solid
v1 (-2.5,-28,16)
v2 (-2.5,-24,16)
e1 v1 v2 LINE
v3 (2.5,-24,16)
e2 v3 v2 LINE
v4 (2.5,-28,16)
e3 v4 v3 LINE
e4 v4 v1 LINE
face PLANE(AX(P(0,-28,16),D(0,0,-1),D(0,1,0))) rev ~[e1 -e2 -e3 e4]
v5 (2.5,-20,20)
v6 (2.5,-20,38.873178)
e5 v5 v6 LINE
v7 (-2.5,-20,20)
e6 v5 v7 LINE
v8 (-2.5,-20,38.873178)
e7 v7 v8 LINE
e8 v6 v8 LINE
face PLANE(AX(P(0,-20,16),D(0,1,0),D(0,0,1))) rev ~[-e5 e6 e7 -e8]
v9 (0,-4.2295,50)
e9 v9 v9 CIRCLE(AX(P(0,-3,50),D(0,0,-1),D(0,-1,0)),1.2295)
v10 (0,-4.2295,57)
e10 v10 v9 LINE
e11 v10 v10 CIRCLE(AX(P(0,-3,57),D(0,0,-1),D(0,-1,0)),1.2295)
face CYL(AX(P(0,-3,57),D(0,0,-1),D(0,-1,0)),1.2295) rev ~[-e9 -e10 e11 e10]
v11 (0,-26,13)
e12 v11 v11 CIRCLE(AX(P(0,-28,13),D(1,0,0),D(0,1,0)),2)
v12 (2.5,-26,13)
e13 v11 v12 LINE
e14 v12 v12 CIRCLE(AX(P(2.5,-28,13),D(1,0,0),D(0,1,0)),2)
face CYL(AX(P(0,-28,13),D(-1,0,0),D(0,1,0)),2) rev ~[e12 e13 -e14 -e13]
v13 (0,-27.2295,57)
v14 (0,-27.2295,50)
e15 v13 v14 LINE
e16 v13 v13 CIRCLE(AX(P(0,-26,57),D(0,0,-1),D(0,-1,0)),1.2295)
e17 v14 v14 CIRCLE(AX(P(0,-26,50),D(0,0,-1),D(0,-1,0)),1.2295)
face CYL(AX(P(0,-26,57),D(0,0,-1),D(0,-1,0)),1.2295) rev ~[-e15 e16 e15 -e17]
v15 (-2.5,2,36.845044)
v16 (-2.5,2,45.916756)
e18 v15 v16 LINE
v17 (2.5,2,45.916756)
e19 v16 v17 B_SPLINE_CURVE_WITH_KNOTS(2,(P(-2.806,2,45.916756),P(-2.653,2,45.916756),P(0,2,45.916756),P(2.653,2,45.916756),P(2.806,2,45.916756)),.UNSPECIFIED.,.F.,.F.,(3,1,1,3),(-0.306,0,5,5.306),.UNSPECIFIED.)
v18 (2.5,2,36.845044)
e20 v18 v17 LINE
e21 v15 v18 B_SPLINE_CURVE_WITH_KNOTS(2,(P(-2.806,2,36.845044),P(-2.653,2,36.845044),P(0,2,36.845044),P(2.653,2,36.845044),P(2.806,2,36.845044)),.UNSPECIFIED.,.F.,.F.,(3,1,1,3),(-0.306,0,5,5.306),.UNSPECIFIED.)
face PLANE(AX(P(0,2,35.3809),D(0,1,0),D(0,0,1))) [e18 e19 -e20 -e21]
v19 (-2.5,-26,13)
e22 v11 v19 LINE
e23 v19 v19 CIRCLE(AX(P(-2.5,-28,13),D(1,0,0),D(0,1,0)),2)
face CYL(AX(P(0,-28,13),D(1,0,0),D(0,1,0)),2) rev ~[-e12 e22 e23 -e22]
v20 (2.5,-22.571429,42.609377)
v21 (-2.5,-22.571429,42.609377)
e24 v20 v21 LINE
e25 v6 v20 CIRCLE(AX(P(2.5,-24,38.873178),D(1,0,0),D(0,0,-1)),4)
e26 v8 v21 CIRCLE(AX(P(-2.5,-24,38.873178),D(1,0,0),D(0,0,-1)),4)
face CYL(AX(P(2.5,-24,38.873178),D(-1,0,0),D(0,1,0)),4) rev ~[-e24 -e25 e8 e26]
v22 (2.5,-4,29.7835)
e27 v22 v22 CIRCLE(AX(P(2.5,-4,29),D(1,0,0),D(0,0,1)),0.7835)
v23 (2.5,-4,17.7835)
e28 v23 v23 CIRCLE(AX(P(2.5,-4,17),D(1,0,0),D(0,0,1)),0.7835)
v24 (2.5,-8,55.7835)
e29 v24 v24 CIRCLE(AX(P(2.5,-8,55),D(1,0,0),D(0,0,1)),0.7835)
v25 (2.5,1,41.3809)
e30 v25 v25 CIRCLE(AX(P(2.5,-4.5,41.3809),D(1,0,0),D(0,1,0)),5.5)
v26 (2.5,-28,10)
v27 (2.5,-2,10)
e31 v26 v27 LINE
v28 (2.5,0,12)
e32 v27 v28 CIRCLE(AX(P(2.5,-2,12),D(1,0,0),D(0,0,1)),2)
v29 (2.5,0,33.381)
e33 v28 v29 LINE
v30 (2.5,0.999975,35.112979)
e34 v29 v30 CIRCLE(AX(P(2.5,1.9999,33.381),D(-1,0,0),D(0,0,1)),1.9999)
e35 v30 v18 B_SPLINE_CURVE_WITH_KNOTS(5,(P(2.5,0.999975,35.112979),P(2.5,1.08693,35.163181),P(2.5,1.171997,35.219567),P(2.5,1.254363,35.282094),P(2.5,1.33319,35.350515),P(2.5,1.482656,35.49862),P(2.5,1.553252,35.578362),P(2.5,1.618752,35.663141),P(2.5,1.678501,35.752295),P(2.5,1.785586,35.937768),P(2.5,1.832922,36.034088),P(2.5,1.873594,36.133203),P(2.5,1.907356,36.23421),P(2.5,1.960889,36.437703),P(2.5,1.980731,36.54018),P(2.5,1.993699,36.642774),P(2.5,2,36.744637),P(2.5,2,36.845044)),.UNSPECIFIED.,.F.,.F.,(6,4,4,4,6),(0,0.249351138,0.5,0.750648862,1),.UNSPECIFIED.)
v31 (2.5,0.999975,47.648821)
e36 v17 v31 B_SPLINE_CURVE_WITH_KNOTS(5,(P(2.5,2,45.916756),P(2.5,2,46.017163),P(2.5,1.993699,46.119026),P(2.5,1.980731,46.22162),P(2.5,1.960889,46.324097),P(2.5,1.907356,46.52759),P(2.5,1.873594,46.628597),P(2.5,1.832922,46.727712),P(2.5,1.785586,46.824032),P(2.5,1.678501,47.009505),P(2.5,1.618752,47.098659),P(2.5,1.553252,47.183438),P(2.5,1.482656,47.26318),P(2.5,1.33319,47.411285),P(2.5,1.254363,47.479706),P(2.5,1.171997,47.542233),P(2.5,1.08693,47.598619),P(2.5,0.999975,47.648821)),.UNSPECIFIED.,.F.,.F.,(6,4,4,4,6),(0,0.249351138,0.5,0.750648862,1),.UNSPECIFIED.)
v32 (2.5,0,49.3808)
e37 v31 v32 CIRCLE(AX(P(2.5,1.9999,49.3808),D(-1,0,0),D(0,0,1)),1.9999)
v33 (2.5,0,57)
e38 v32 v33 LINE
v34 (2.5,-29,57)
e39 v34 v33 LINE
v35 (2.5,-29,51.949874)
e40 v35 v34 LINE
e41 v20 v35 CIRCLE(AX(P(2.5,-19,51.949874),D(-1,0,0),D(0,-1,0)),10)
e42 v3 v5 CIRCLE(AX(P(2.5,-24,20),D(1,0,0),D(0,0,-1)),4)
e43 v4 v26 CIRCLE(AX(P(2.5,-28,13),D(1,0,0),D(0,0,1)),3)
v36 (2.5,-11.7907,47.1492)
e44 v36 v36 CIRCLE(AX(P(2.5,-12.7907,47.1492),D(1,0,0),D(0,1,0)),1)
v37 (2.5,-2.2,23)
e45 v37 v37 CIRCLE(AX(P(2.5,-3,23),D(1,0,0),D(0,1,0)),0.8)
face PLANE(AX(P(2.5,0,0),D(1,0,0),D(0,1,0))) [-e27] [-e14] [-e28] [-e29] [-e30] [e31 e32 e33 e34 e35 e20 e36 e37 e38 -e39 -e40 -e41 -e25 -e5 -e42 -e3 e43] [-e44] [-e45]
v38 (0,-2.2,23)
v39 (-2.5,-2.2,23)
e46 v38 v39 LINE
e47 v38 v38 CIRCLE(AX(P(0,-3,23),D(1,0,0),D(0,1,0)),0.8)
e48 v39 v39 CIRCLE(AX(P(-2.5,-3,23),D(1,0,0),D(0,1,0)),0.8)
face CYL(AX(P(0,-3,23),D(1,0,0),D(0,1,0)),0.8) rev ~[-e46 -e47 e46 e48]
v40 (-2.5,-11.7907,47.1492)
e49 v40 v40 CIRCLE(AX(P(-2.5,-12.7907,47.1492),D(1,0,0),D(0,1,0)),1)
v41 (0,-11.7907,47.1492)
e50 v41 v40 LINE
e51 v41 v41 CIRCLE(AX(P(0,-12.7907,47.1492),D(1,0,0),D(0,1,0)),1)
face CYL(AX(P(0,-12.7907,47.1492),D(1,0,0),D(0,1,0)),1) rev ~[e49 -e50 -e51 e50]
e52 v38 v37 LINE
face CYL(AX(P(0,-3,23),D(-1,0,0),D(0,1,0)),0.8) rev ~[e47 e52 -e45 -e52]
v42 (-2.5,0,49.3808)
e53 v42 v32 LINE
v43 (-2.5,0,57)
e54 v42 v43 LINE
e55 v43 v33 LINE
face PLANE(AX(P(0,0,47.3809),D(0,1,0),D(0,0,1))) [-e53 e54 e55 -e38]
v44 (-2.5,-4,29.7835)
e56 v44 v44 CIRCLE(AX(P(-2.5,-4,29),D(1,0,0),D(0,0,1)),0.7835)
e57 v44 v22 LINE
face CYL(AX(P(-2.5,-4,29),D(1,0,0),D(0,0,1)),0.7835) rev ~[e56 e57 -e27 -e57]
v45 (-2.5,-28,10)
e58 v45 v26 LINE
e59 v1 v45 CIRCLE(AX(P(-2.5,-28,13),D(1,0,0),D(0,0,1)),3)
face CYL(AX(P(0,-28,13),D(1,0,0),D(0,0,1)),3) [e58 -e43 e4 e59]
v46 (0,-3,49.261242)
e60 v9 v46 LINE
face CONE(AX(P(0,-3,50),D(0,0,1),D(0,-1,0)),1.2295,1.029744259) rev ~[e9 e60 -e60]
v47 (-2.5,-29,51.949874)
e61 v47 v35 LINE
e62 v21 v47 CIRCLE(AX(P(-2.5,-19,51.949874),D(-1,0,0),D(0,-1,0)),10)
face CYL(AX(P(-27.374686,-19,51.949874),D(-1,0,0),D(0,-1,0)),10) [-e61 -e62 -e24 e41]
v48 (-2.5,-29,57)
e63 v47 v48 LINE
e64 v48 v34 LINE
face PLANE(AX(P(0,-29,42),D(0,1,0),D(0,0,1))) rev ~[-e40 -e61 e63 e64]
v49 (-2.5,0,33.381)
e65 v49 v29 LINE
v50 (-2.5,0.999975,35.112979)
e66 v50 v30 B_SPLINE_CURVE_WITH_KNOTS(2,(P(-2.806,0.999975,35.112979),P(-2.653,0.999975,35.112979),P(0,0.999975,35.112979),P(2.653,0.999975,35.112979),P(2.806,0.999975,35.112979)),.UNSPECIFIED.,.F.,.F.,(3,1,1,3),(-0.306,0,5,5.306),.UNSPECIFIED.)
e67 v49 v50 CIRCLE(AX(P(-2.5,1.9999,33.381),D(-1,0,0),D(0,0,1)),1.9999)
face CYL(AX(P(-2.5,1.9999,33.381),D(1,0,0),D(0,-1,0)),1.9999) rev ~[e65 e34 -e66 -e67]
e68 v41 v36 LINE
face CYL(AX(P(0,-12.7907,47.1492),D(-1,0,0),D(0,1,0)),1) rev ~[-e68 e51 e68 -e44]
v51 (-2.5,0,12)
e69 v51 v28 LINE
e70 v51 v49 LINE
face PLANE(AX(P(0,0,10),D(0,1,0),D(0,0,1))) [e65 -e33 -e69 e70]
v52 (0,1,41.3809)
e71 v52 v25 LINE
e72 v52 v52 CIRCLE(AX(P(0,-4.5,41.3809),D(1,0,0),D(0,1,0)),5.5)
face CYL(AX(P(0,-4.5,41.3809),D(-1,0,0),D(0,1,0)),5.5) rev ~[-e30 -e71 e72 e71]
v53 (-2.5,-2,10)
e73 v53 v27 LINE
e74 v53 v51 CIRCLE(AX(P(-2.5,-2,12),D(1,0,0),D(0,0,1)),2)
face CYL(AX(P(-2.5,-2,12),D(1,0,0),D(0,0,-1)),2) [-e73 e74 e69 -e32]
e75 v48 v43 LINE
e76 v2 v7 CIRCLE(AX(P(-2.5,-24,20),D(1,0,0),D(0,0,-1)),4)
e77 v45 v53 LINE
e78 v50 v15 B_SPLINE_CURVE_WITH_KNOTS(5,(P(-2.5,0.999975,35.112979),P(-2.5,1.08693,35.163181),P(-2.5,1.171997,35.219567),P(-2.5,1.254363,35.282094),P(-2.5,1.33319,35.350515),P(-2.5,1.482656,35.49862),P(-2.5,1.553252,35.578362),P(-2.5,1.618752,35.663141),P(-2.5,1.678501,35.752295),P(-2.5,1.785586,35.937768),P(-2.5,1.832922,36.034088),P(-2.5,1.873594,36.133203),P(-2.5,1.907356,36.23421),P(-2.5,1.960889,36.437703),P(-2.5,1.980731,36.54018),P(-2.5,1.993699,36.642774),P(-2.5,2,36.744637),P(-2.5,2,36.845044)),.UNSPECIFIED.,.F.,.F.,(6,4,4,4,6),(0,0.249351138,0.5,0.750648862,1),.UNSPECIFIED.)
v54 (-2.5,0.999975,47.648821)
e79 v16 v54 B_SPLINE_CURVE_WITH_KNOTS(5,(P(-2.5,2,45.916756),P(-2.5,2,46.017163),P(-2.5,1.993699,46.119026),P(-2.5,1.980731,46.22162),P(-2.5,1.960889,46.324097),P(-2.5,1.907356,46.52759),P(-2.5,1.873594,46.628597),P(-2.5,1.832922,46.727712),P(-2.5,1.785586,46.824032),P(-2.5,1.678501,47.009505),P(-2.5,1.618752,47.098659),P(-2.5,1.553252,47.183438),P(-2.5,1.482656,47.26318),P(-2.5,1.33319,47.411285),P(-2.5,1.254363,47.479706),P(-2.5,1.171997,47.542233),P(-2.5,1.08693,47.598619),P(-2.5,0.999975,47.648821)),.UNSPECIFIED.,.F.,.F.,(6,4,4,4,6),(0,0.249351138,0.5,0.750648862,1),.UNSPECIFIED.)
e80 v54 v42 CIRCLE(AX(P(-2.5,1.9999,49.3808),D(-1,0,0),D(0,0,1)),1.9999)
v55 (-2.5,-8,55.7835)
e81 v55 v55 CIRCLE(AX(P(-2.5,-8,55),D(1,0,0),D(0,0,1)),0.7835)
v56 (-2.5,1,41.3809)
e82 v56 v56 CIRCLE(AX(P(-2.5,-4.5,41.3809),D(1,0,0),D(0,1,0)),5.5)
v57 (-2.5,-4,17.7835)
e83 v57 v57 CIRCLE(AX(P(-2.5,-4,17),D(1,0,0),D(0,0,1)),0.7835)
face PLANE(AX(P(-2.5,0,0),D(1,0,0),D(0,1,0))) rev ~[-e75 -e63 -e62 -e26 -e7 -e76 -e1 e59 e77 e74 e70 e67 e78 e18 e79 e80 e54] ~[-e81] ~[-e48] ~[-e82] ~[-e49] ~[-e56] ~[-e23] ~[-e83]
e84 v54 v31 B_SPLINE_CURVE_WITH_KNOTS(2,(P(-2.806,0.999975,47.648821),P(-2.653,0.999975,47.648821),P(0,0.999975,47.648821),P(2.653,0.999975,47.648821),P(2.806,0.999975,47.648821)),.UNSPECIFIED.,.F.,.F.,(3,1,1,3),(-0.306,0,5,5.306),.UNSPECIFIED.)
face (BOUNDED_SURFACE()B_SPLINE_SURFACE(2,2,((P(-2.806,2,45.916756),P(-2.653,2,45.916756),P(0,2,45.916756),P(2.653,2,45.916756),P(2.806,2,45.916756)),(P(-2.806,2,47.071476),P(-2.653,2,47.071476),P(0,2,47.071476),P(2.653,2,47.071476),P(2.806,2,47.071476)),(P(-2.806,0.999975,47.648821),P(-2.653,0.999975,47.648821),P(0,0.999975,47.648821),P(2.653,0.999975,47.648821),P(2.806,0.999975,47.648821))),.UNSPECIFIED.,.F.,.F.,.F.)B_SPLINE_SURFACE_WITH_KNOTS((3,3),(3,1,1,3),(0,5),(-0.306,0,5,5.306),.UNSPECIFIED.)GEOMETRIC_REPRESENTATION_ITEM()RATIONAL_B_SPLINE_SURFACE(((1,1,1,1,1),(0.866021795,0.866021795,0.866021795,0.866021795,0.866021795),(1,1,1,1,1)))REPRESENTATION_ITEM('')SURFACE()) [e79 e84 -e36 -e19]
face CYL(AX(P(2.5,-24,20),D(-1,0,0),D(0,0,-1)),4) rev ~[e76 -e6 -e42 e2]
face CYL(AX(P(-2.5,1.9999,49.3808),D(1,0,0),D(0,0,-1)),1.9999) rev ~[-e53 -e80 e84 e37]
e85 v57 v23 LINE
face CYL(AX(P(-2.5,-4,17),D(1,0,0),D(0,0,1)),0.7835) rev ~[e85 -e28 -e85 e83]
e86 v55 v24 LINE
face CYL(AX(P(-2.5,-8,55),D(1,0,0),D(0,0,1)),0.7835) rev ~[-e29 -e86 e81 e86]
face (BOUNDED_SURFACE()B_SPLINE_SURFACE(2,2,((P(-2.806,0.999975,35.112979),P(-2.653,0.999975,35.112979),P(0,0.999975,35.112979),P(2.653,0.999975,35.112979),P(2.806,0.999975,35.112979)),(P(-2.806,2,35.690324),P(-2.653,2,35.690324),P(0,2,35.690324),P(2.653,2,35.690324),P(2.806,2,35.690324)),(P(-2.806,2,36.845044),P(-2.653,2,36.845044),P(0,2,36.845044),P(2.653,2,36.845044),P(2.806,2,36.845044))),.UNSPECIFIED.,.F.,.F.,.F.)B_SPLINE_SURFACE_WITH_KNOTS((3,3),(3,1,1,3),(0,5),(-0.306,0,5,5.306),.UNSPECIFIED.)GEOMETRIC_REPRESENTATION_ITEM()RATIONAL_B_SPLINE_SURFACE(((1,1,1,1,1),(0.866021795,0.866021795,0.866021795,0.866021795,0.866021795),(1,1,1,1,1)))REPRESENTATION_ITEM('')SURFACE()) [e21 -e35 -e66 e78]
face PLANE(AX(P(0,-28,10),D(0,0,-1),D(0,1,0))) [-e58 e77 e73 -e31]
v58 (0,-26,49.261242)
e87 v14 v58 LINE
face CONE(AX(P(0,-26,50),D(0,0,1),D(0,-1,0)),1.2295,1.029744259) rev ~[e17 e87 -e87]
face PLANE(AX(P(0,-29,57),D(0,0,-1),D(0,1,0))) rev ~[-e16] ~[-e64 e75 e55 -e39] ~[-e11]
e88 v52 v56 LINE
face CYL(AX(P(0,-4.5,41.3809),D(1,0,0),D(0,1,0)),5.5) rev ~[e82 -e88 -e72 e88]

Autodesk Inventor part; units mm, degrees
ref_plane "YZ Plane" through (0, 0, 0) normal (1, 0, 0) x (0, 1, 0)
ref_plane "XZ Plane" through (0, 0, 0) normal (0, 1, 0) x (-1, 0, 0)
ref_plane "XY Plane" through (0, 0, 0) normal (0, 0, 1) x (1, 0, 0)
sketch "Skizze1" plane through (0, 0, 0) normal (1, 0, 0) x (0, 1, 0)
  circle A0 centre (-22.8, 48.5) radius 11 construction
  circle A1 centre (-4.5, 41.3809) radius 6.5 construction
  line L0 (-97.6965, 0) -> (58.2827, 0) projected
  circle A2 centre (14.5, 21.5) radius 21.5 construction
  line L1 (-28, 10) -> (0, 10)
  line L2 (0, 10) -> (0, 35.3809)
  line L3 (-7, 0) -> (-7, 21.5) construction
  circle A3 centre (-4.5, 41.3809) radius 6 construction
  circle A4 centre (-4.5, 41.3809) radius 5 construction
  line L4 (-56.6136, 29) -> (0, 29) construction
  arc A5 (-28, 16) -> (-28, 10) centre (-28, 13) ccw
  line L5 (-75.4137, 30) -> (0, 30) construction
  line L6 (-28, 16) -> (-20, 16)
  line L7 (-20, 16) -> (-20, 42)
  line L8 (-20, 42) -> (-29, 42)
  line L9 (-29, 42) -> (-29, 57)
  circle A6 centre (-28, 13) radius 2
  circle A7 centre (-4.5, 41.3809) radius 5.5
  circle A8 centre (-22.8, 48.5) radius 0.5
  circle A9 centre (-3, 23) radius 0.8
  line L10 (14.5, 21.5) -> (-7, 21.5) construction
  line L11 (-29, 57) -> (0, 57)
  line L12 (-4.5, 41.3809) -> (-28, 13) construction
  line L13 (14.5, 21.5) -> (14.5, 20.5) construction
  line L14 (14.5, 20.5) -> (-4.5, 41.3809) construction
  circle A10 centre (-22.8, 48.5) radius 5 construction
  circle A11 centre (-12.7907, 47.1492) radius 5.1 construction
  circle A12 centre (-12.7907, 47.1492) radius 5.6 construction
  circle A13 centre (-12.7907, 47.1492) radius 1
  line L15 (0, 35.3809) -> (2, 35.3809)
  line L16 (2, 35.3809) -> (2, 47.3809)
  line L17 (2, 47.3809) -> (0, 47.3809)
  line L18 (0, 47.3809) -> (0, 57)
  line L19 (1, 41.3809) -> (-10, 41.3809) construction
  point P0 (0, 0)
  dimension "d4" = 43
  dimension "d0" = 22
  dimension "d2" = 13
  dimension "d5" = 10
  dimension "d6" = 7
  dimension "d7" = 12
  dimension "d8" = 10
  dimension "d9" = 29
  dimension "d11" = 30
  dimension "d12" = 4
  dimension "d14" = 6
  dimension "d15" = 28
  dimension "d16" = 20
  dimension "d17" = 42
  dimension "d19" = 29
  dimension "d20" = 11
  dimension "d33" = 1
  dimension "d34" = 48.5
  dimension "d36" = 1.6
  dimension "d37" = 3
  dimension "d54" = 57
  dimension "d58" = 1
  dimension "d59" = 81.925
  dimension "d65" = 10
  dimension "d66" = 10.2
  dimension "d67" = 0.5
  dimension "d68" = 2
  dimension "d69" = 2
  dimension "d70" = 6
  dimension "d72" = 1.5
  dimension "d73" = 22.8
extrude "Extrusion1" add sketch "Skizze1" along normal mid plane 5 contours A5 L6 L7 L8 L9 L11 L18 L17 L16 L15 L2 L1 | A8
sketch "Skizze2" plane through (-2.5, -29, 57) normal (0, 0, 1) x (1, 0, 0)
  line L0 (0, 0) -> (5, 0) projected
  line L1 (5, 5) -> (5, 0) projected
  line L2 (0, 0) -> (0, 5) projected
  line L3 (2.5, 29) -> (2.5, 0) construction
  line L4 (0, 0) -> (5, 0) construction
  line L5 (0, 5) -> (5, 5) projected
  line L6 (0, 29) -> (5, 29) projected
  line L7 (0, 29) -> (5, 29) projected
  point P0 (2.5, 26)
  point P1 (2.5, 3)
  dimension "d25" = 23
  dimension "d74" = 3
hole "Bohrung1" at (0, -3, 57) at (0, -26, 57) direction (0, 0, -1) diameter 2.459 depth 7 tip angle 118 thread size "M3x0.5" class "6H" standard "ISO Metric profile"
fillet "Rundung1" radius 10 1 edges at (0, -29, 42)
sketch "Skizze3" plane through (-2.5, 0, 0) normal (-1, 0, 0) x (0, 0, 1)
  circle A0 centre (23, -3) radius 0.8 projected
  line L0 (29, -4) -> (17, -4) construction
  circle A1 centre (23, -3) radius 0.8 construction
  line L1 (23, -4) -> (23, -3) construction
  point P0 (0, 0)
  point P1 (55, -8)
  dimension "d38" = 12
  dimension "d39" = 1
  dimension "d40" = 32
  dimension "d41" = 5
hole "Bohrung2" at (-2.5, -4, 17) at (-2.5, -4, 29) at (-2.5, -8, 55) direction (1, 0, 0) diameter 1.567 end through all thread size "M2x0.4" class "6H" standard "ISO Metric profile"
fillet "Rundung2" radius 4 2 edges at (0, -20, 42) (0, -20, 16)
fillet "Rundung3" radius 2 1 edges at (0, 0, 10)
fillet "Rundung4" radius 2 4 edges at (0, 0, 47.3809) (0, 2, 47.3809) (0, 2, 35.3809) (0, 0, 35.3809)
properties part number "Dribbler Seite" material "Aluminium 6061"
